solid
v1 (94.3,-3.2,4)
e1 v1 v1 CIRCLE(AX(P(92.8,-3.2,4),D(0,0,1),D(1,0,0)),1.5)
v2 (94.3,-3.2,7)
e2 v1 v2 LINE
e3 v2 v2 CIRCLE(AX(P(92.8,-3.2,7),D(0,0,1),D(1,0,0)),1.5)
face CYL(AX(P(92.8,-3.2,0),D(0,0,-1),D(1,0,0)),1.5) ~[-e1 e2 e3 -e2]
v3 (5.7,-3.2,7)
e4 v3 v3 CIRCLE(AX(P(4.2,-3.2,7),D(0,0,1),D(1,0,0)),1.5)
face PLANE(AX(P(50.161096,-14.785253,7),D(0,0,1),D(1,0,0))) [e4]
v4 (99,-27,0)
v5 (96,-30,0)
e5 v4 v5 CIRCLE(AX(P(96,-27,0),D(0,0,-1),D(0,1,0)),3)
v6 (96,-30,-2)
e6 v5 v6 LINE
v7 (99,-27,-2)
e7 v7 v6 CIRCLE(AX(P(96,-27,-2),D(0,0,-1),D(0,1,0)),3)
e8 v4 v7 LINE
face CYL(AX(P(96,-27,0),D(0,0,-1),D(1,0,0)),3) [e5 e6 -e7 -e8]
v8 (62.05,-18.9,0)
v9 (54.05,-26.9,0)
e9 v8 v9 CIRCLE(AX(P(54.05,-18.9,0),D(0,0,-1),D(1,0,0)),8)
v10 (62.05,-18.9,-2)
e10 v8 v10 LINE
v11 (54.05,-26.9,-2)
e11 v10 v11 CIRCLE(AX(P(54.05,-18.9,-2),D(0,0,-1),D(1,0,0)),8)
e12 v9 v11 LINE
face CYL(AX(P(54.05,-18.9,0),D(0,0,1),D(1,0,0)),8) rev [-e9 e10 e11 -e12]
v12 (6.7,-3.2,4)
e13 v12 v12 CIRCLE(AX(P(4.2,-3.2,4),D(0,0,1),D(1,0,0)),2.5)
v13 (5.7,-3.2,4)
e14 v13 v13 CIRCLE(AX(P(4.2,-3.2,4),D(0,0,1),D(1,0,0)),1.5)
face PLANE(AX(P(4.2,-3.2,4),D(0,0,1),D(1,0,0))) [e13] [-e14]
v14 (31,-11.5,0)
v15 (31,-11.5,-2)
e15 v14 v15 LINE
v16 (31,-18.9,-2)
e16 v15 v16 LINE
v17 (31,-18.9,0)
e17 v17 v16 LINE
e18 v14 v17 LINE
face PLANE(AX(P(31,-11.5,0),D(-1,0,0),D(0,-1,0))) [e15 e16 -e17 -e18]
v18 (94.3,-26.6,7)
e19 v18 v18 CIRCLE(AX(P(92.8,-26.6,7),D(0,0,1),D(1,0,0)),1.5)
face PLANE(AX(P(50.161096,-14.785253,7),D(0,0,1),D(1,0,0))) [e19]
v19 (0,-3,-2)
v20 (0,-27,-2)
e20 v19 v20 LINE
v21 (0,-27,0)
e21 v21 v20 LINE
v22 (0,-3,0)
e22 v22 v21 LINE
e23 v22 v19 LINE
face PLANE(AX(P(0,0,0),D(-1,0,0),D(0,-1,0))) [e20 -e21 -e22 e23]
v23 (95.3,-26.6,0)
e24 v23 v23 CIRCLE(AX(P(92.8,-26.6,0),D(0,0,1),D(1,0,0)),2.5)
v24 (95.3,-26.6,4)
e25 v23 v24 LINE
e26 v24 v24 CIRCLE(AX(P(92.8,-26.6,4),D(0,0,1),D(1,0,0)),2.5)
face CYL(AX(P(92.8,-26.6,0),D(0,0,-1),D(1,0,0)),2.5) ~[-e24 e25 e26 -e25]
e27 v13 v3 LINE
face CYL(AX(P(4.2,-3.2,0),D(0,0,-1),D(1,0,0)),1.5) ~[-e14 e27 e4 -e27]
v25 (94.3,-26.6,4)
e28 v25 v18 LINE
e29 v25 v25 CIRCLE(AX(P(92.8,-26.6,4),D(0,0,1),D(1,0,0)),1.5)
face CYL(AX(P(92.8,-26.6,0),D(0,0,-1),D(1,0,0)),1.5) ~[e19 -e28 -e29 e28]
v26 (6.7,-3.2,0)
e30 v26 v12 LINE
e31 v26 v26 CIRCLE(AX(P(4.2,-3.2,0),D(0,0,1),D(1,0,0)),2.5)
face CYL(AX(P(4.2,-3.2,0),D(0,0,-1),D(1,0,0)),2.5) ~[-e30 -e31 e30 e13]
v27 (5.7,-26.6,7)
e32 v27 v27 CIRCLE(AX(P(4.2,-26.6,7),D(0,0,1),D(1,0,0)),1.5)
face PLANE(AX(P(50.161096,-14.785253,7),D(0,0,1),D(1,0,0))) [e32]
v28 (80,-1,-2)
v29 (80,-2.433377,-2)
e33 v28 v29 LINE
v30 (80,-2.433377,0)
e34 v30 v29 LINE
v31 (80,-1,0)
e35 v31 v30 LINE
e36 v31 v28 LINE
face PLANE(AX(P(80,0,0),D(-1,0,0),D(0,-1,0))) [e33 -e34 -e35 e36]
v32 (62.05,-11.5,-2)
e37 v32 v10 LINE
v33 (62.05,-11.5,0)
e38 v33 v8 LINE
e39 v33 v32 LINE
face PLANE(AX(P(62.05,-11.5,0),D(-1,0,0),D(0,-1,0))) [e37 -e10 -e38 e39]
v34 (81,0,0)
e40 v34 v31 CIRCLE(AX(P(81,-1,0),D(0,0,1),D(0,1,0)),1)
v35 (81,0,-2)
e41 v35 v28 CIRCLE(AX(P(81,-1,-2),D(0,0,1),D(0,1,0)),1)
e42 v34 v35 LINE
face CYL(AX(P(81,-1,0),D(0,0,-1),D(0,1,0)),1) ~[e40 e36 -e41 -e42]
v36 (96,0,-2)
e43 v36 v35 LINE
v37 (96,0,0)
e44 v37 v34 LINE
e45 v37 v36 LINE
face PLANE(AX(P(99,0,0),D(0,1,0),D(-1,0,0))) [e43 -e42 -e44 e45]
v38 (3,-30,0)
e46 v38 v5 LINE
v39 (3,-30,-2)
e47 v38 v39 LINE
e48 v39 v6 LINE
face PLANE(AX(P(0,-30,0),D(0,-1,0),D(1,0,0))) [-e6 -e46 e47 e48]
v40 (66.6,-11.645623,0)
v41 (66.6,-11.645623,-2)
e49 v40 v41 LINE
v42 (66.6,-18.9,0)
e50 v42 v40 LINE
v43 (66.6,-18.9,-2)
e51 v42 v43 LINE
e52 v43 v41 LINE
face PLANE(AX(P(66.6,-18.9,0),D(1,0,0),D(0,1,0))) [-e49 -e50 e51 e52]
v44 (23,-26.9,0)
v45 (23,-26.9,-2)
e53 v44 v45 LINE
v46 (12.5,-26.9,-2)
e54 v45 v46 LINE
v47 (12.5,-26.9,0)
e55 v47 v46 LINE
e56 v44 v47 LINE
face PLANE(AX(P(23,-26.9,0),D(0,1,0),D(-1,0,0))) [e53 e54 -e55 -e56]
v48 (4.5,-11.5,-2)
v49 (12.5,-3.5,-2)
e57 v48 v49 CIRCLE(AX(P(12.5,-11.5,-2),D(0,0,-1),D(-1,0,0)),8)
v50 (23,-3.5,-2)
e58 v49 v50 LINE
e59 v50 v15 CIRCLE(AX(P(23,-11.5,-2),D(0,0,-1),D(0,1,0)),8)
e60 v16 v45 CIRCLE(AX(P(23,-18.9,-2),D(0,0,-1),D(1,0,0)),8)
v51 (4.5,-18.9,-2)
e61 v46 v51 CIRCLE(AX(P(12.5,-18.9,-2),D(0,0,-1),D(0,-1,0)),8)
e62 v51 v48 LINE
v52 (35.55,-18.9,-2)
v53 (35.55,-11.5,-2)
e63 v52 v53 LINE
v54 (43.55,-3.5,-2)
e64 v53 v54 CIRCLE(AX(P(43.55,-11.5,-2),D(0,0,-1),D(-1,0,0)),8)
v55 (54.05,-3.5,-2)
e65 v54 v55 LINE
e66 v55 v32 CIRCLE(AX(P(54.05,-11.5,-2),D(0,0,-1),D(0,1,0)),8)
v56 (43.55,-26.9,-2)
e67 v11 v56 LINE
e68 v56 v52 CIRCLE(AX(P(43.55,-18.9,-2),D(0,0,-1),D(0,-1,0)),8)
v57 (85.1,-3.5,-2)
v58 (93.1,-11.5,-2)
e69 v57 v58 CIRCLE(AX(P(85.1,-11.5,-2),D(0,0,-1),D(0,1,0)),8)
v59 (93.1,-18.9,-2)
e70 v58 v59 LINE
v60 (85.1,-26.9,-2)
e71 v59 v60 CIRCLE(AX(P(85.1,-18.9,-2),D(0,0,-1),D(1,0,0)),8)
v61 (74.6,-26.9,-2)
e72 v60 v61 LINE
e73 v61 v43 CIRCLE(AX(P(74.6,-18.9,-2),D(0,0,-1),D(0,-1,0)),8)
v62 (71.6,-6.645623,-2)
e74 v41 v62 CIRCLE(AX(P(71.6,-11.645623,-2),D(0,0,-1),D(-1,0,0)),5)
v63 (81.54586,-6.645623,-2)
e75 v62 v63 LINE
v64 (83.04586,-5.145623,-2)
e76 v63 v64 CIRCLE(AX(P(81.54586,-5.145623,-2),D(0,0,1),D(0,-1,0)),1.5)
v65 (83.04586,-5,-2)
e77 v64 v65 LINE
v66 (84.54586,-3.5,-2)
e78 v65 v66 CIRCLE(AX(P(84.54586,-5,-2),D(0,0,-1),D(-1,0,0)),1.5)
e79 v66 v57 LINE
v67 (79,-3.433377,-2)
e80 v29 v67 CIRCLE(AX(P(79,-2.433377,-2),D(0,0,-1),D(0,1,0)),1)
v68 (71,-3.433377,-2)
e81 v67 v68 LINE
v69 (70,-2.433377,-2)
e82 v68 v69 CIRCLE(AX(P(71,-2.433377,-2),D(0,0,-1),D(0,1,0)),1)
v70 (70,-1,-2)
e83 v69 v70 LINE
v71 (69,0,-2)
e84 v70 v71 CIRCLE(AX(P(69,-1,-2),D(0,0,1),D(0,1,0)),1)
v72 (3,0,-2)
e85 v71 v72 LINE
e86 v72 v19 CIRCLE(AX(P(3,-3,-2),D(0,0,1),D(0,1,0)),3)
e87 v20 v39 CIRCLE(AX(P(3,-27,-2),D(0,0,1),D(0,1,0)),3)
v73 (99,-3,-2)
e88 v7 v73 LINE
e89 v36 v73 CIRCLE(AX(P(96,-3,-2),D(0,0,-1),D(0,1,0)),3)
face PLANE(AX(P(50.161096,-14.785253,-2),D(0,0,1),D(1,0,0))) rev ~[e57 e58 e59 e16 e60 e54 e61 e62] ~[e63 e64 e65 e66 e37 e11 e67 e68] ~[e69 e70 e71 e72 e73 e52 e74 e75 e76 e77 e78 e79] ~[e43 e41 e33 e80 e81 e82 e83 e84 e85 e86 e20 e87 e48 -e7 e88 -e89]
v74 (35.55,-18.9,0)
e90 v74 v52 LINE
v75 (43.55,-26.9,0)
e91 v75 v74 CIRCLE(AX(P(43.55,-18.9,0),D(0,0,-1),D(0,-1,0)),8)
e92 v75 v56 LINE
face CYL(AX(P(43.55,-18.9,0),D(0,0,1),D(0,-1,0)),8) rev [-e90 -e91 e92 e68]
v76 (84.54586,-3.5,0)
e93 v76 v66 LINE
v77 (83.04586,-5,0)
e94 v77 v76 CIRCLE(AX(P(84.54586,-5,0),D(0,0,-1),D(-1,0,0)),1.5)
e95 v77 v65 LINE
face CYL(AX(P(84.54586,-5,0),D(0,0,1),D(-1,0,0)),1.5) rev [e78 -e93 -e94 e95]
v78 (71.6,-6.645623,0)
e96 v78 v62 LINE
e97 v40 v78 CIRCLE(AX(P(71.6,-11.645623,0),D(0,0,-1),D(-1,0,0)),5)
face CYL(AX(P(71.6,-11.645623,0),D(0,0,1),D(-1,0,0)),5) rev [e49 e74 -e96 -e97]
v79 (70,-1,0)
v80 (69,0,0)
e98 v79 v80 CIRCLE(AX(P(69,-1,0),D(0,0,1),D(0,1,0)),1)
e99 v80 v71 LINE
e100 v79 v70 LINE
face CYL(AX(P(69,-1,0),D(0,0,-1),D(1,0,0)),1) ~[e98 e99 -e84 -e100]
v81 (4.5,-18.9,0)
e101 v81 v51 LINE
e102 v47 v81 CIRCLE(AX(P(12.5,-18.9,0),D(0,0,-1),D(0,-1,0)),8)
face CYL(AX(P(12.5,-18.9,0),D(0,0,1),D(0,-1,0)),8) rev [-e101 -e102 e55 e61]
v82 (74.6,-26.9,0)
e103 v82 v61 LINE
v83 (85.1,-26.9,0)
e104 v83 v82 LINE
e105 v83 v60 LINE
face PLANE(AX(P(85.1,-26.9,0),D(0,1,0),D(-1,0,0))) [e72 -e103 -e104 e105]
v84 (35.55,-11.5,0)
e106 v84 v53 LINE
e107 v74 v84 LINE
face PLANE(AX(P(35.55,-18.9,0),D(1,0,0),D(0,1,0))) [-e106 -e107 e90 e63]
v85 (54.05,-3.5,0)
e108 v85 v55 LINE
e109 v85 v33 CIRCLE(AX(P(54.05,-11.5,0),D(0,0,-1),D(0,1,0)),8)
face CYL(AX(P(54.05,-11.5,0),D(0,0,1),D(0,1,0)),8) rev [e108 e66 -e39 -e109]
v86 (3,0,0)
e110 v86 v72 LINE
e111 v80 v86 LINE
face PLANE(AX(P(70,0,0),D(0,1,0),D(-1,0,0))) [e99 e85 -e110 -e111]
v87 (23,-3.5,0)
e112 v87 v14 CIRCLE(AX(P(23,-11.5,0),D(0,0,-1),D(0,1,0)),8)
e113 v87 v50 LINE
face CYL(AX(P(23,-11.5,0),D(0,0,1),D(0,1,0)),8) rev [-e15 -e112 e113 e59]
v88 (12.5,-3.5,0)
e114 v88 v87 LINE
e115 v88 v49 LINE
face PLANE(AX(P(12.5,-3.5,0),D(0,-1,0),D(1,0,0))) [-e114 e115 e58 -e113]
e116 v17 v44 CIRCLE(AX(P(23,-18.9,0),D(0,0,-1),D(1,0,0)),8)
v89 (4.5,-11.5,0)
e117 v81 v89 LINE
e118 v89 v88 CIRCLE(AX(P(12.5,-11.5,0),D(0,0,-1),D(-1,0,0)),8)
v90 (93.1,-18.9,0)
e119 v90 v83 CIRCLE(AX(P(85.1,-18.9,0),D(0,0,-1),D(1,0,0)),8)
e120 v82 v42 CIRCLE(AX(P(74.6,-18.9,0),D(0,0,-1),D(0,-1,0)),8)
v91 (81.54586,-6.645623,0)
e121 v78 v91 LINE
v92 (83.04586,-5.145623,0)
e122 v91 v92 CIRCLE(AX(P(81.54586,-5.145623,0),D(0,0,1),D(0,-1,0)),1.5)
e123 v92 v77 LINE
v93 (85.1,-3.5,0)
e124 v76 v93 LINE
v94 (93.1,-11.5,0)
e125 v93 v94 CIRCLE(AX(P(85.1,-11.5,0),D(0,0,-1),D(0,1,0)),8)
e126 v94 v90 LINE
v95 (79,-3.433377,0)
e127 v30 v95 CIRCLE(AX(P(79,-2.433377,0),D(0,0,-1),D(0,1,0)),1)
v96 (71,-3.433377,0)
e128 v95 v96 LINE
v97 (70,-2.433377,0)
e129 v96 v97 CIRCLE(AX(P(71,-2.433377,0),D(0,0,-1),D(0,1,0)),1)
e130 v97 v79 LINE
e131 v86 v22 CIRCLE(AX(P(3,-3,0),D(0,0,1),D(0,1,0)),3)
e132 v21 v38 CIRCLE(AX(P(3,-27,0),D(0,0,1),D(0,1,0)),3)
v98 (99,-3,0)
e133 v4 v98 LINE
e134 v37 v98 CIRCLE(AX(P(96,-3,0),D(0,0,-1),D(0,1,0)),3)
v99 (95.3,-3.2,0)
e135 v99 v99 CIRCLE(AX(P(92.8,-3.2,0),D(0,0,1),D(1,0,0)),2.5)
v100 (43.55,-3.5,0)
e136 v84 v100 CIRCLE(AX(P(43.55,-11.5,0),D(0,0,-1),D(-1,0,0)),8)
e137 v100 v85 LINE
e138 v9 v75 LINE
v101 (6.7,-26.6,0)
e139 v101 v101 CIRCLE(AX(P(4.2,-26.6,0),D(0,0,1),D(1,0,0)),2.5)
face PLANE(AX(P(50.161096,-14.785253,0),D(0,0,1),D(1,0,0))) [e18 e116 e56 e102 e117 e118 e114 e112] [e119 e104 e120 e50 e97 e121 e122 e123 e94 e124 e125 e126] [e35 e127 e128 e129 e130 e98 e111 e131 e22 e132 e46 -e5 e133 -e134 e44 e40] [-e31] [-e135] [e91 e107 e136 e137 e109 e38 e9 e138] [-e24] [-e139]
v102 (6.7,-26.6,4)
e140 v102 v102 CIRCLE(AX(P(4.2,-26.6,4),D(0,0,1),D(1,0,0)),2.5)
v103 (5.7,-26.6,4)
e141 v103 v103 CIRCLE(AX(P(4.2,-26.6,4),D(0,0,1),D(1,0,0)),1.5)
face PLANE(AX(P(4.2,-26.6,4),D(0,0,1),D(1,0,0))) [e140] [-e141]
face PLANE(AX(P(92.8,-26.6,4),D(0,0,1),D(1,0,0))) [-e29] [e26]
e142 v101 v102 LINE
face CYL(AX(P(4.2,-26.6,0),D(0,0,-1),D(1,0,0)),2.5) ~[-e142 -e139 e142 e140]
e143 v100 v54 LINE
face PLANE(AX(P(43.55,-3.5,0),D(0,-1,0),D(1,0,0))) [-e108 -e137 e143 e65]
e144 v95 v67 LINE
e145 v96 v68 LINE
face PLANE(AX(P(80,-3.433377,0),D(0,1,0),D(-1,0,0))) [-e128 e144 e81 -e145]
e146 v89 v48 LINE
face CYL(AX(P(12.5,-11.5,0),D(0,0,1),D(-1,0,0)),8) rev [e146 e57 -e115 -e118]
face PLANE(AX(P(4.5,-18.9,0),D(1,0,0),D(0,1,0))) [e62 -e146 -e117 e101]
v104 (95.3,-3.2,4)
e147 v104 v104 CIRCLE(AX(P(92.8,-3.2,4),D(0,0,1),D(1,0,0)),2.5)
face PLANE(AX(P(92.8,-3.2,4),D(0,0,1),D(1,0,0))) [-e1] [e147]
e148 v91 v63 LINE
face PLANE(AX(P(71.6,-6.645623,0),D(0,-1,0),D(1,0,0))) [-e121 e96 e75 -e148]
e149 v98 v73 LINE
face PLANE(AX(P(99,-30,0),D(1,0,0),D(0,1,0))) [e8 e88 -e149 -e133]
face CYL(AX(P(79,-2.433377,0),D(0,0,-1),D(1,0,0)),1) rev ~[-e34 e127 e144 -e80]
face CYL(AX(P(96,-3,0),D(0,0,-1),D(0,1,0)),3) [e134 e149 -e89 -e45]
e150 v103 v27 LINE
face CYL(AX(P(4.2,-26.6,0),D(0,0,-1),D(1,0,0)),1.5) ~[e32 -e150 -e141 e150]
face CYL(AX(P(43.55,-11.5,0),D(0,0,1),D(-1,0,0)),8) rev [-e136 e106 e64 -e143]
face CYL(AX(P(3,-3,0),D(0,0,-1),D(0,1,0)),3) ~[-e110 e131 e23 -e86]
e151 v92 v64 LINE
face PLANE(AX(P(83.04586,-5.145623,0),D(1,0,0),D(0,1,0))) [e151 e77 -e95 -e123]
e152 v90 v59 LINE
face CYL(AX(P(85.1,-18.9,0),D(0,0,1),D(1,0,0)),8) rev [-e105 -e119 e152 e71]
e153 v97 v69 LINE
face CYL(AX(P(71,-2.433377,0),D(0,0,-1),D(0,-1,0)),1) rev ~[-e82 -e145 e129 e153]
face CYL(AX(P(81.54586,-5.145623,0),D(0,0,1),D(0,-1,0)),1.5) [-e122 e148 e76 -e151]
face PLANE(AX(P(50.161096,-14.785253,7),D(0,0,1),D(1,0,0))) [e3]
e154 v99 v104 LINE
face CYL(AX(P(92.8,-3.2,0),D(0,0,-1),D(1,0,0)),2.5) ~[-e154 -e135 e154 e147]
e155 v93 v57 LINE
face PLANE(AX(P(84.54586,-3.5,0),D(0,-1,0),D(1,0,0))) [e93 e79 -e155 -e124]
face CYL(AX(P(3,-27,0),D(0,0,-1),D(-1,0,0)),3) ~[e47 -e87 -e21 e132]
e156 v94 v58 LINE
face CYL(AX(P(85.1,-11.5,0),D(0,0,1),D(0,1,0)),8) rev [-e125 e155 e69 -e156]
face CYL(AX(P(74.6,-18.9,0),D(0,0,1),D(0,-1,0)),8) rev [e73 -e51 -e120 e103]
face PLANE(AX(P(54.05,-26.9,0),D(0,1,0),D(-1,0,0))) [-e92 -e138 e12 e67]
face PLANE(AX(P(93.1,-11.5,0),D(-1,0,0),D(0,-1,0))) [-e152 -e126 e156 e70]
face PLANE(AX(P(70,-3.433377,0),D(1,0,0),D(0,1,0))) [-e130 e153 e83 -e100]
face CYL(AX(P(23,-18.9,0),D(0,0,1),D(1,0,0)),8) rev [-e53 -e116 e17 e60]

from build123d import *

# Parameters (mm, degrees)
F1_DEPTH = 2
F3_R     = 3
F4_R     = 1
F2_R     = 2.5
F2_R_2   = 1.5
F5_DEPTH = 4
F6_DEPTH = 7


with BuildPart() as f1:
    # F0 (on Top) → F1 (new body)
    with BuildSketch(Plane.XY):
        Polygon((80, -3.433377482), (70, -3.433377482), (70, 0), (0, 0), (0, -30), (99, -30), (99, 0), (80, 0), align=None)
        with BuildLine():
            ThreePointArc((4.5, -11.5), (6.8431457505, -5.8431457505), (12.5, -3.5))
            Line((12.5, -3.5), (23, -3.5))
            ThreePointArc((23, -3.5), (28.6568542495, -5.8431457505), (31, -11.5))
            Line((31, -11.5), (31, -18.9))
            ThreePointArc((31, -18.9), (28.6568542495, -24.5568542495), (23, -26.9))
            Line((23, -26.9), (12.5, -26.9))
            ThreePointArc((12.5, -26.9), (6.8431457505, -24.5568542495), (4.5, -18.9))
            Line((4.5, -18.9), (4.5, -11.5))
        make_face(mode=Mode.SUBTRACT)
        with BuildLine():
            ThreePointArc((35.55, -11.5), (37.8931457505, -5.8431457505), (43.55, -3.5))
            Line((43.55, -3.5), (54.05, -3.5))
            ThreePointArc((54.05, -3.5), (59.7068542495, -5.8431457505), (62.05, -11.5))
            Line((62.05, -11.5), (62.05, -18.9))
            ThreePointArc((62.05, -18.9), (59.7068542495, -24.5568542495), (54.05, -26.9))
            Line((54.05, -26.9), (43.55, -26.9))
            ThreePointArc((43.55, -26.9), (37.8931457505, -24.5568542495), (35.55, -18.9))
            Line((35.55, -18.9), (35.55, -11.5))
        make_face(mode=Mode.SUBTRACT)
        with BuildLine():
            Line((84.5458595753, -3.5), (85.1, -3.5))
            ThreePointArc((85.1, -3.5), (90.7568542495, -5.8431457505), (93.1, -11.5))
            Line((93.1, -11.5), (93.1, -18.9))
            ThreePointArc((93.1, -18.9), (90.7568542495, -24.5568542495), (85.1, -26.9))
            Line((85.1, -26.9), (74.6, -26.9))
            ThreePointArc((74.6, -26.9), (68.9431457505, -24.5568542495), (66.6, -18.9))
            Line((66.6, -18.9), (66.6, -11.6456231289))
            ThreePointArc((66.6, -11.6456231289), (68.0644660941, -8.1100892229), (71.6, -6.6456231289))
            Line((71.6, -6.6456231289), (81.5458595753, -6.6456231289))
            ThreePointArc((81.5458595753, -6.6456231289), (82.6065197471, -6.2062833006), (83.0458595753, -5.1456231289))
            Line((83.0458595753, -5.1456231289), (83.0458595753, -5))
            ThreePointArc((83.0458595753, -5), (83.4851994035, -3.9393398282), (84.5458595753, -3.5))
        make_face(mode=Mode.SUBTRACT)
    extrude(amount=-F1_DEPTH)

    # F3
    f3_edges = [f1.edges().sort_by_distance(p)[0] for p in [
        (0, 0, -1),
        (0, -30, -1),
        (99, -30, -1),
        (99, 0, -1),
    ]]
    fillet(f3_edges, radius=F3_R)

    # F4
    f4_edges = [f1.edges().sort_by_distance(p)[0] for p in [
        (70, -3.433377, -1),
        (80, -3.433377, -1),
        (70, 0, -1),
        (80, 0, -1),
    ]]
    fillet(f4_edges, radius=F4_R)

    # F2 (on face) → F5 (join)
    with BuildSketch(Plane.XY):
        with Locations((4.2, -3.2)):
            Circle(F2_R)
        with Locations((4.2, -3.2)):
            Circle(F2_R_2, mode=Mode.SUBTRACT)
        with Locations((92.8, -3.2)):
            Circle(F2_R)
        with Locations((92.8, -3.2)):
            Circle(F2_R_2, mode=Mode.SUBTRACT)
        with Locations((92.8, -26.6)):
            Circle(F2_R)
        with Locations((92.8, -26.6)):
            Circle(F2_R_2, mode=Mode.SUBTRACT)
        with Locations((4.2, -26.6)):
            Circle(F2_R)
        with Locations((4.2, -26.6)):
            Circle(F2_R_2, mode=Mode.SUBTRACT)
    extrude(amount=F5_DEPTH)

    # F6 (add): faces of the model
    f6_faces = [f1.faces().sort_by_distance(p)[0] for p in [
        (4.2, -3.2, 0),
        (4.2, -26.6, 0),
        (92.8, -3.2, 0),
        (92.8, -26.6, 0),
    ]]
    extrude(f6_faces, amount=F6_DEPTH)


solid = f1.part
